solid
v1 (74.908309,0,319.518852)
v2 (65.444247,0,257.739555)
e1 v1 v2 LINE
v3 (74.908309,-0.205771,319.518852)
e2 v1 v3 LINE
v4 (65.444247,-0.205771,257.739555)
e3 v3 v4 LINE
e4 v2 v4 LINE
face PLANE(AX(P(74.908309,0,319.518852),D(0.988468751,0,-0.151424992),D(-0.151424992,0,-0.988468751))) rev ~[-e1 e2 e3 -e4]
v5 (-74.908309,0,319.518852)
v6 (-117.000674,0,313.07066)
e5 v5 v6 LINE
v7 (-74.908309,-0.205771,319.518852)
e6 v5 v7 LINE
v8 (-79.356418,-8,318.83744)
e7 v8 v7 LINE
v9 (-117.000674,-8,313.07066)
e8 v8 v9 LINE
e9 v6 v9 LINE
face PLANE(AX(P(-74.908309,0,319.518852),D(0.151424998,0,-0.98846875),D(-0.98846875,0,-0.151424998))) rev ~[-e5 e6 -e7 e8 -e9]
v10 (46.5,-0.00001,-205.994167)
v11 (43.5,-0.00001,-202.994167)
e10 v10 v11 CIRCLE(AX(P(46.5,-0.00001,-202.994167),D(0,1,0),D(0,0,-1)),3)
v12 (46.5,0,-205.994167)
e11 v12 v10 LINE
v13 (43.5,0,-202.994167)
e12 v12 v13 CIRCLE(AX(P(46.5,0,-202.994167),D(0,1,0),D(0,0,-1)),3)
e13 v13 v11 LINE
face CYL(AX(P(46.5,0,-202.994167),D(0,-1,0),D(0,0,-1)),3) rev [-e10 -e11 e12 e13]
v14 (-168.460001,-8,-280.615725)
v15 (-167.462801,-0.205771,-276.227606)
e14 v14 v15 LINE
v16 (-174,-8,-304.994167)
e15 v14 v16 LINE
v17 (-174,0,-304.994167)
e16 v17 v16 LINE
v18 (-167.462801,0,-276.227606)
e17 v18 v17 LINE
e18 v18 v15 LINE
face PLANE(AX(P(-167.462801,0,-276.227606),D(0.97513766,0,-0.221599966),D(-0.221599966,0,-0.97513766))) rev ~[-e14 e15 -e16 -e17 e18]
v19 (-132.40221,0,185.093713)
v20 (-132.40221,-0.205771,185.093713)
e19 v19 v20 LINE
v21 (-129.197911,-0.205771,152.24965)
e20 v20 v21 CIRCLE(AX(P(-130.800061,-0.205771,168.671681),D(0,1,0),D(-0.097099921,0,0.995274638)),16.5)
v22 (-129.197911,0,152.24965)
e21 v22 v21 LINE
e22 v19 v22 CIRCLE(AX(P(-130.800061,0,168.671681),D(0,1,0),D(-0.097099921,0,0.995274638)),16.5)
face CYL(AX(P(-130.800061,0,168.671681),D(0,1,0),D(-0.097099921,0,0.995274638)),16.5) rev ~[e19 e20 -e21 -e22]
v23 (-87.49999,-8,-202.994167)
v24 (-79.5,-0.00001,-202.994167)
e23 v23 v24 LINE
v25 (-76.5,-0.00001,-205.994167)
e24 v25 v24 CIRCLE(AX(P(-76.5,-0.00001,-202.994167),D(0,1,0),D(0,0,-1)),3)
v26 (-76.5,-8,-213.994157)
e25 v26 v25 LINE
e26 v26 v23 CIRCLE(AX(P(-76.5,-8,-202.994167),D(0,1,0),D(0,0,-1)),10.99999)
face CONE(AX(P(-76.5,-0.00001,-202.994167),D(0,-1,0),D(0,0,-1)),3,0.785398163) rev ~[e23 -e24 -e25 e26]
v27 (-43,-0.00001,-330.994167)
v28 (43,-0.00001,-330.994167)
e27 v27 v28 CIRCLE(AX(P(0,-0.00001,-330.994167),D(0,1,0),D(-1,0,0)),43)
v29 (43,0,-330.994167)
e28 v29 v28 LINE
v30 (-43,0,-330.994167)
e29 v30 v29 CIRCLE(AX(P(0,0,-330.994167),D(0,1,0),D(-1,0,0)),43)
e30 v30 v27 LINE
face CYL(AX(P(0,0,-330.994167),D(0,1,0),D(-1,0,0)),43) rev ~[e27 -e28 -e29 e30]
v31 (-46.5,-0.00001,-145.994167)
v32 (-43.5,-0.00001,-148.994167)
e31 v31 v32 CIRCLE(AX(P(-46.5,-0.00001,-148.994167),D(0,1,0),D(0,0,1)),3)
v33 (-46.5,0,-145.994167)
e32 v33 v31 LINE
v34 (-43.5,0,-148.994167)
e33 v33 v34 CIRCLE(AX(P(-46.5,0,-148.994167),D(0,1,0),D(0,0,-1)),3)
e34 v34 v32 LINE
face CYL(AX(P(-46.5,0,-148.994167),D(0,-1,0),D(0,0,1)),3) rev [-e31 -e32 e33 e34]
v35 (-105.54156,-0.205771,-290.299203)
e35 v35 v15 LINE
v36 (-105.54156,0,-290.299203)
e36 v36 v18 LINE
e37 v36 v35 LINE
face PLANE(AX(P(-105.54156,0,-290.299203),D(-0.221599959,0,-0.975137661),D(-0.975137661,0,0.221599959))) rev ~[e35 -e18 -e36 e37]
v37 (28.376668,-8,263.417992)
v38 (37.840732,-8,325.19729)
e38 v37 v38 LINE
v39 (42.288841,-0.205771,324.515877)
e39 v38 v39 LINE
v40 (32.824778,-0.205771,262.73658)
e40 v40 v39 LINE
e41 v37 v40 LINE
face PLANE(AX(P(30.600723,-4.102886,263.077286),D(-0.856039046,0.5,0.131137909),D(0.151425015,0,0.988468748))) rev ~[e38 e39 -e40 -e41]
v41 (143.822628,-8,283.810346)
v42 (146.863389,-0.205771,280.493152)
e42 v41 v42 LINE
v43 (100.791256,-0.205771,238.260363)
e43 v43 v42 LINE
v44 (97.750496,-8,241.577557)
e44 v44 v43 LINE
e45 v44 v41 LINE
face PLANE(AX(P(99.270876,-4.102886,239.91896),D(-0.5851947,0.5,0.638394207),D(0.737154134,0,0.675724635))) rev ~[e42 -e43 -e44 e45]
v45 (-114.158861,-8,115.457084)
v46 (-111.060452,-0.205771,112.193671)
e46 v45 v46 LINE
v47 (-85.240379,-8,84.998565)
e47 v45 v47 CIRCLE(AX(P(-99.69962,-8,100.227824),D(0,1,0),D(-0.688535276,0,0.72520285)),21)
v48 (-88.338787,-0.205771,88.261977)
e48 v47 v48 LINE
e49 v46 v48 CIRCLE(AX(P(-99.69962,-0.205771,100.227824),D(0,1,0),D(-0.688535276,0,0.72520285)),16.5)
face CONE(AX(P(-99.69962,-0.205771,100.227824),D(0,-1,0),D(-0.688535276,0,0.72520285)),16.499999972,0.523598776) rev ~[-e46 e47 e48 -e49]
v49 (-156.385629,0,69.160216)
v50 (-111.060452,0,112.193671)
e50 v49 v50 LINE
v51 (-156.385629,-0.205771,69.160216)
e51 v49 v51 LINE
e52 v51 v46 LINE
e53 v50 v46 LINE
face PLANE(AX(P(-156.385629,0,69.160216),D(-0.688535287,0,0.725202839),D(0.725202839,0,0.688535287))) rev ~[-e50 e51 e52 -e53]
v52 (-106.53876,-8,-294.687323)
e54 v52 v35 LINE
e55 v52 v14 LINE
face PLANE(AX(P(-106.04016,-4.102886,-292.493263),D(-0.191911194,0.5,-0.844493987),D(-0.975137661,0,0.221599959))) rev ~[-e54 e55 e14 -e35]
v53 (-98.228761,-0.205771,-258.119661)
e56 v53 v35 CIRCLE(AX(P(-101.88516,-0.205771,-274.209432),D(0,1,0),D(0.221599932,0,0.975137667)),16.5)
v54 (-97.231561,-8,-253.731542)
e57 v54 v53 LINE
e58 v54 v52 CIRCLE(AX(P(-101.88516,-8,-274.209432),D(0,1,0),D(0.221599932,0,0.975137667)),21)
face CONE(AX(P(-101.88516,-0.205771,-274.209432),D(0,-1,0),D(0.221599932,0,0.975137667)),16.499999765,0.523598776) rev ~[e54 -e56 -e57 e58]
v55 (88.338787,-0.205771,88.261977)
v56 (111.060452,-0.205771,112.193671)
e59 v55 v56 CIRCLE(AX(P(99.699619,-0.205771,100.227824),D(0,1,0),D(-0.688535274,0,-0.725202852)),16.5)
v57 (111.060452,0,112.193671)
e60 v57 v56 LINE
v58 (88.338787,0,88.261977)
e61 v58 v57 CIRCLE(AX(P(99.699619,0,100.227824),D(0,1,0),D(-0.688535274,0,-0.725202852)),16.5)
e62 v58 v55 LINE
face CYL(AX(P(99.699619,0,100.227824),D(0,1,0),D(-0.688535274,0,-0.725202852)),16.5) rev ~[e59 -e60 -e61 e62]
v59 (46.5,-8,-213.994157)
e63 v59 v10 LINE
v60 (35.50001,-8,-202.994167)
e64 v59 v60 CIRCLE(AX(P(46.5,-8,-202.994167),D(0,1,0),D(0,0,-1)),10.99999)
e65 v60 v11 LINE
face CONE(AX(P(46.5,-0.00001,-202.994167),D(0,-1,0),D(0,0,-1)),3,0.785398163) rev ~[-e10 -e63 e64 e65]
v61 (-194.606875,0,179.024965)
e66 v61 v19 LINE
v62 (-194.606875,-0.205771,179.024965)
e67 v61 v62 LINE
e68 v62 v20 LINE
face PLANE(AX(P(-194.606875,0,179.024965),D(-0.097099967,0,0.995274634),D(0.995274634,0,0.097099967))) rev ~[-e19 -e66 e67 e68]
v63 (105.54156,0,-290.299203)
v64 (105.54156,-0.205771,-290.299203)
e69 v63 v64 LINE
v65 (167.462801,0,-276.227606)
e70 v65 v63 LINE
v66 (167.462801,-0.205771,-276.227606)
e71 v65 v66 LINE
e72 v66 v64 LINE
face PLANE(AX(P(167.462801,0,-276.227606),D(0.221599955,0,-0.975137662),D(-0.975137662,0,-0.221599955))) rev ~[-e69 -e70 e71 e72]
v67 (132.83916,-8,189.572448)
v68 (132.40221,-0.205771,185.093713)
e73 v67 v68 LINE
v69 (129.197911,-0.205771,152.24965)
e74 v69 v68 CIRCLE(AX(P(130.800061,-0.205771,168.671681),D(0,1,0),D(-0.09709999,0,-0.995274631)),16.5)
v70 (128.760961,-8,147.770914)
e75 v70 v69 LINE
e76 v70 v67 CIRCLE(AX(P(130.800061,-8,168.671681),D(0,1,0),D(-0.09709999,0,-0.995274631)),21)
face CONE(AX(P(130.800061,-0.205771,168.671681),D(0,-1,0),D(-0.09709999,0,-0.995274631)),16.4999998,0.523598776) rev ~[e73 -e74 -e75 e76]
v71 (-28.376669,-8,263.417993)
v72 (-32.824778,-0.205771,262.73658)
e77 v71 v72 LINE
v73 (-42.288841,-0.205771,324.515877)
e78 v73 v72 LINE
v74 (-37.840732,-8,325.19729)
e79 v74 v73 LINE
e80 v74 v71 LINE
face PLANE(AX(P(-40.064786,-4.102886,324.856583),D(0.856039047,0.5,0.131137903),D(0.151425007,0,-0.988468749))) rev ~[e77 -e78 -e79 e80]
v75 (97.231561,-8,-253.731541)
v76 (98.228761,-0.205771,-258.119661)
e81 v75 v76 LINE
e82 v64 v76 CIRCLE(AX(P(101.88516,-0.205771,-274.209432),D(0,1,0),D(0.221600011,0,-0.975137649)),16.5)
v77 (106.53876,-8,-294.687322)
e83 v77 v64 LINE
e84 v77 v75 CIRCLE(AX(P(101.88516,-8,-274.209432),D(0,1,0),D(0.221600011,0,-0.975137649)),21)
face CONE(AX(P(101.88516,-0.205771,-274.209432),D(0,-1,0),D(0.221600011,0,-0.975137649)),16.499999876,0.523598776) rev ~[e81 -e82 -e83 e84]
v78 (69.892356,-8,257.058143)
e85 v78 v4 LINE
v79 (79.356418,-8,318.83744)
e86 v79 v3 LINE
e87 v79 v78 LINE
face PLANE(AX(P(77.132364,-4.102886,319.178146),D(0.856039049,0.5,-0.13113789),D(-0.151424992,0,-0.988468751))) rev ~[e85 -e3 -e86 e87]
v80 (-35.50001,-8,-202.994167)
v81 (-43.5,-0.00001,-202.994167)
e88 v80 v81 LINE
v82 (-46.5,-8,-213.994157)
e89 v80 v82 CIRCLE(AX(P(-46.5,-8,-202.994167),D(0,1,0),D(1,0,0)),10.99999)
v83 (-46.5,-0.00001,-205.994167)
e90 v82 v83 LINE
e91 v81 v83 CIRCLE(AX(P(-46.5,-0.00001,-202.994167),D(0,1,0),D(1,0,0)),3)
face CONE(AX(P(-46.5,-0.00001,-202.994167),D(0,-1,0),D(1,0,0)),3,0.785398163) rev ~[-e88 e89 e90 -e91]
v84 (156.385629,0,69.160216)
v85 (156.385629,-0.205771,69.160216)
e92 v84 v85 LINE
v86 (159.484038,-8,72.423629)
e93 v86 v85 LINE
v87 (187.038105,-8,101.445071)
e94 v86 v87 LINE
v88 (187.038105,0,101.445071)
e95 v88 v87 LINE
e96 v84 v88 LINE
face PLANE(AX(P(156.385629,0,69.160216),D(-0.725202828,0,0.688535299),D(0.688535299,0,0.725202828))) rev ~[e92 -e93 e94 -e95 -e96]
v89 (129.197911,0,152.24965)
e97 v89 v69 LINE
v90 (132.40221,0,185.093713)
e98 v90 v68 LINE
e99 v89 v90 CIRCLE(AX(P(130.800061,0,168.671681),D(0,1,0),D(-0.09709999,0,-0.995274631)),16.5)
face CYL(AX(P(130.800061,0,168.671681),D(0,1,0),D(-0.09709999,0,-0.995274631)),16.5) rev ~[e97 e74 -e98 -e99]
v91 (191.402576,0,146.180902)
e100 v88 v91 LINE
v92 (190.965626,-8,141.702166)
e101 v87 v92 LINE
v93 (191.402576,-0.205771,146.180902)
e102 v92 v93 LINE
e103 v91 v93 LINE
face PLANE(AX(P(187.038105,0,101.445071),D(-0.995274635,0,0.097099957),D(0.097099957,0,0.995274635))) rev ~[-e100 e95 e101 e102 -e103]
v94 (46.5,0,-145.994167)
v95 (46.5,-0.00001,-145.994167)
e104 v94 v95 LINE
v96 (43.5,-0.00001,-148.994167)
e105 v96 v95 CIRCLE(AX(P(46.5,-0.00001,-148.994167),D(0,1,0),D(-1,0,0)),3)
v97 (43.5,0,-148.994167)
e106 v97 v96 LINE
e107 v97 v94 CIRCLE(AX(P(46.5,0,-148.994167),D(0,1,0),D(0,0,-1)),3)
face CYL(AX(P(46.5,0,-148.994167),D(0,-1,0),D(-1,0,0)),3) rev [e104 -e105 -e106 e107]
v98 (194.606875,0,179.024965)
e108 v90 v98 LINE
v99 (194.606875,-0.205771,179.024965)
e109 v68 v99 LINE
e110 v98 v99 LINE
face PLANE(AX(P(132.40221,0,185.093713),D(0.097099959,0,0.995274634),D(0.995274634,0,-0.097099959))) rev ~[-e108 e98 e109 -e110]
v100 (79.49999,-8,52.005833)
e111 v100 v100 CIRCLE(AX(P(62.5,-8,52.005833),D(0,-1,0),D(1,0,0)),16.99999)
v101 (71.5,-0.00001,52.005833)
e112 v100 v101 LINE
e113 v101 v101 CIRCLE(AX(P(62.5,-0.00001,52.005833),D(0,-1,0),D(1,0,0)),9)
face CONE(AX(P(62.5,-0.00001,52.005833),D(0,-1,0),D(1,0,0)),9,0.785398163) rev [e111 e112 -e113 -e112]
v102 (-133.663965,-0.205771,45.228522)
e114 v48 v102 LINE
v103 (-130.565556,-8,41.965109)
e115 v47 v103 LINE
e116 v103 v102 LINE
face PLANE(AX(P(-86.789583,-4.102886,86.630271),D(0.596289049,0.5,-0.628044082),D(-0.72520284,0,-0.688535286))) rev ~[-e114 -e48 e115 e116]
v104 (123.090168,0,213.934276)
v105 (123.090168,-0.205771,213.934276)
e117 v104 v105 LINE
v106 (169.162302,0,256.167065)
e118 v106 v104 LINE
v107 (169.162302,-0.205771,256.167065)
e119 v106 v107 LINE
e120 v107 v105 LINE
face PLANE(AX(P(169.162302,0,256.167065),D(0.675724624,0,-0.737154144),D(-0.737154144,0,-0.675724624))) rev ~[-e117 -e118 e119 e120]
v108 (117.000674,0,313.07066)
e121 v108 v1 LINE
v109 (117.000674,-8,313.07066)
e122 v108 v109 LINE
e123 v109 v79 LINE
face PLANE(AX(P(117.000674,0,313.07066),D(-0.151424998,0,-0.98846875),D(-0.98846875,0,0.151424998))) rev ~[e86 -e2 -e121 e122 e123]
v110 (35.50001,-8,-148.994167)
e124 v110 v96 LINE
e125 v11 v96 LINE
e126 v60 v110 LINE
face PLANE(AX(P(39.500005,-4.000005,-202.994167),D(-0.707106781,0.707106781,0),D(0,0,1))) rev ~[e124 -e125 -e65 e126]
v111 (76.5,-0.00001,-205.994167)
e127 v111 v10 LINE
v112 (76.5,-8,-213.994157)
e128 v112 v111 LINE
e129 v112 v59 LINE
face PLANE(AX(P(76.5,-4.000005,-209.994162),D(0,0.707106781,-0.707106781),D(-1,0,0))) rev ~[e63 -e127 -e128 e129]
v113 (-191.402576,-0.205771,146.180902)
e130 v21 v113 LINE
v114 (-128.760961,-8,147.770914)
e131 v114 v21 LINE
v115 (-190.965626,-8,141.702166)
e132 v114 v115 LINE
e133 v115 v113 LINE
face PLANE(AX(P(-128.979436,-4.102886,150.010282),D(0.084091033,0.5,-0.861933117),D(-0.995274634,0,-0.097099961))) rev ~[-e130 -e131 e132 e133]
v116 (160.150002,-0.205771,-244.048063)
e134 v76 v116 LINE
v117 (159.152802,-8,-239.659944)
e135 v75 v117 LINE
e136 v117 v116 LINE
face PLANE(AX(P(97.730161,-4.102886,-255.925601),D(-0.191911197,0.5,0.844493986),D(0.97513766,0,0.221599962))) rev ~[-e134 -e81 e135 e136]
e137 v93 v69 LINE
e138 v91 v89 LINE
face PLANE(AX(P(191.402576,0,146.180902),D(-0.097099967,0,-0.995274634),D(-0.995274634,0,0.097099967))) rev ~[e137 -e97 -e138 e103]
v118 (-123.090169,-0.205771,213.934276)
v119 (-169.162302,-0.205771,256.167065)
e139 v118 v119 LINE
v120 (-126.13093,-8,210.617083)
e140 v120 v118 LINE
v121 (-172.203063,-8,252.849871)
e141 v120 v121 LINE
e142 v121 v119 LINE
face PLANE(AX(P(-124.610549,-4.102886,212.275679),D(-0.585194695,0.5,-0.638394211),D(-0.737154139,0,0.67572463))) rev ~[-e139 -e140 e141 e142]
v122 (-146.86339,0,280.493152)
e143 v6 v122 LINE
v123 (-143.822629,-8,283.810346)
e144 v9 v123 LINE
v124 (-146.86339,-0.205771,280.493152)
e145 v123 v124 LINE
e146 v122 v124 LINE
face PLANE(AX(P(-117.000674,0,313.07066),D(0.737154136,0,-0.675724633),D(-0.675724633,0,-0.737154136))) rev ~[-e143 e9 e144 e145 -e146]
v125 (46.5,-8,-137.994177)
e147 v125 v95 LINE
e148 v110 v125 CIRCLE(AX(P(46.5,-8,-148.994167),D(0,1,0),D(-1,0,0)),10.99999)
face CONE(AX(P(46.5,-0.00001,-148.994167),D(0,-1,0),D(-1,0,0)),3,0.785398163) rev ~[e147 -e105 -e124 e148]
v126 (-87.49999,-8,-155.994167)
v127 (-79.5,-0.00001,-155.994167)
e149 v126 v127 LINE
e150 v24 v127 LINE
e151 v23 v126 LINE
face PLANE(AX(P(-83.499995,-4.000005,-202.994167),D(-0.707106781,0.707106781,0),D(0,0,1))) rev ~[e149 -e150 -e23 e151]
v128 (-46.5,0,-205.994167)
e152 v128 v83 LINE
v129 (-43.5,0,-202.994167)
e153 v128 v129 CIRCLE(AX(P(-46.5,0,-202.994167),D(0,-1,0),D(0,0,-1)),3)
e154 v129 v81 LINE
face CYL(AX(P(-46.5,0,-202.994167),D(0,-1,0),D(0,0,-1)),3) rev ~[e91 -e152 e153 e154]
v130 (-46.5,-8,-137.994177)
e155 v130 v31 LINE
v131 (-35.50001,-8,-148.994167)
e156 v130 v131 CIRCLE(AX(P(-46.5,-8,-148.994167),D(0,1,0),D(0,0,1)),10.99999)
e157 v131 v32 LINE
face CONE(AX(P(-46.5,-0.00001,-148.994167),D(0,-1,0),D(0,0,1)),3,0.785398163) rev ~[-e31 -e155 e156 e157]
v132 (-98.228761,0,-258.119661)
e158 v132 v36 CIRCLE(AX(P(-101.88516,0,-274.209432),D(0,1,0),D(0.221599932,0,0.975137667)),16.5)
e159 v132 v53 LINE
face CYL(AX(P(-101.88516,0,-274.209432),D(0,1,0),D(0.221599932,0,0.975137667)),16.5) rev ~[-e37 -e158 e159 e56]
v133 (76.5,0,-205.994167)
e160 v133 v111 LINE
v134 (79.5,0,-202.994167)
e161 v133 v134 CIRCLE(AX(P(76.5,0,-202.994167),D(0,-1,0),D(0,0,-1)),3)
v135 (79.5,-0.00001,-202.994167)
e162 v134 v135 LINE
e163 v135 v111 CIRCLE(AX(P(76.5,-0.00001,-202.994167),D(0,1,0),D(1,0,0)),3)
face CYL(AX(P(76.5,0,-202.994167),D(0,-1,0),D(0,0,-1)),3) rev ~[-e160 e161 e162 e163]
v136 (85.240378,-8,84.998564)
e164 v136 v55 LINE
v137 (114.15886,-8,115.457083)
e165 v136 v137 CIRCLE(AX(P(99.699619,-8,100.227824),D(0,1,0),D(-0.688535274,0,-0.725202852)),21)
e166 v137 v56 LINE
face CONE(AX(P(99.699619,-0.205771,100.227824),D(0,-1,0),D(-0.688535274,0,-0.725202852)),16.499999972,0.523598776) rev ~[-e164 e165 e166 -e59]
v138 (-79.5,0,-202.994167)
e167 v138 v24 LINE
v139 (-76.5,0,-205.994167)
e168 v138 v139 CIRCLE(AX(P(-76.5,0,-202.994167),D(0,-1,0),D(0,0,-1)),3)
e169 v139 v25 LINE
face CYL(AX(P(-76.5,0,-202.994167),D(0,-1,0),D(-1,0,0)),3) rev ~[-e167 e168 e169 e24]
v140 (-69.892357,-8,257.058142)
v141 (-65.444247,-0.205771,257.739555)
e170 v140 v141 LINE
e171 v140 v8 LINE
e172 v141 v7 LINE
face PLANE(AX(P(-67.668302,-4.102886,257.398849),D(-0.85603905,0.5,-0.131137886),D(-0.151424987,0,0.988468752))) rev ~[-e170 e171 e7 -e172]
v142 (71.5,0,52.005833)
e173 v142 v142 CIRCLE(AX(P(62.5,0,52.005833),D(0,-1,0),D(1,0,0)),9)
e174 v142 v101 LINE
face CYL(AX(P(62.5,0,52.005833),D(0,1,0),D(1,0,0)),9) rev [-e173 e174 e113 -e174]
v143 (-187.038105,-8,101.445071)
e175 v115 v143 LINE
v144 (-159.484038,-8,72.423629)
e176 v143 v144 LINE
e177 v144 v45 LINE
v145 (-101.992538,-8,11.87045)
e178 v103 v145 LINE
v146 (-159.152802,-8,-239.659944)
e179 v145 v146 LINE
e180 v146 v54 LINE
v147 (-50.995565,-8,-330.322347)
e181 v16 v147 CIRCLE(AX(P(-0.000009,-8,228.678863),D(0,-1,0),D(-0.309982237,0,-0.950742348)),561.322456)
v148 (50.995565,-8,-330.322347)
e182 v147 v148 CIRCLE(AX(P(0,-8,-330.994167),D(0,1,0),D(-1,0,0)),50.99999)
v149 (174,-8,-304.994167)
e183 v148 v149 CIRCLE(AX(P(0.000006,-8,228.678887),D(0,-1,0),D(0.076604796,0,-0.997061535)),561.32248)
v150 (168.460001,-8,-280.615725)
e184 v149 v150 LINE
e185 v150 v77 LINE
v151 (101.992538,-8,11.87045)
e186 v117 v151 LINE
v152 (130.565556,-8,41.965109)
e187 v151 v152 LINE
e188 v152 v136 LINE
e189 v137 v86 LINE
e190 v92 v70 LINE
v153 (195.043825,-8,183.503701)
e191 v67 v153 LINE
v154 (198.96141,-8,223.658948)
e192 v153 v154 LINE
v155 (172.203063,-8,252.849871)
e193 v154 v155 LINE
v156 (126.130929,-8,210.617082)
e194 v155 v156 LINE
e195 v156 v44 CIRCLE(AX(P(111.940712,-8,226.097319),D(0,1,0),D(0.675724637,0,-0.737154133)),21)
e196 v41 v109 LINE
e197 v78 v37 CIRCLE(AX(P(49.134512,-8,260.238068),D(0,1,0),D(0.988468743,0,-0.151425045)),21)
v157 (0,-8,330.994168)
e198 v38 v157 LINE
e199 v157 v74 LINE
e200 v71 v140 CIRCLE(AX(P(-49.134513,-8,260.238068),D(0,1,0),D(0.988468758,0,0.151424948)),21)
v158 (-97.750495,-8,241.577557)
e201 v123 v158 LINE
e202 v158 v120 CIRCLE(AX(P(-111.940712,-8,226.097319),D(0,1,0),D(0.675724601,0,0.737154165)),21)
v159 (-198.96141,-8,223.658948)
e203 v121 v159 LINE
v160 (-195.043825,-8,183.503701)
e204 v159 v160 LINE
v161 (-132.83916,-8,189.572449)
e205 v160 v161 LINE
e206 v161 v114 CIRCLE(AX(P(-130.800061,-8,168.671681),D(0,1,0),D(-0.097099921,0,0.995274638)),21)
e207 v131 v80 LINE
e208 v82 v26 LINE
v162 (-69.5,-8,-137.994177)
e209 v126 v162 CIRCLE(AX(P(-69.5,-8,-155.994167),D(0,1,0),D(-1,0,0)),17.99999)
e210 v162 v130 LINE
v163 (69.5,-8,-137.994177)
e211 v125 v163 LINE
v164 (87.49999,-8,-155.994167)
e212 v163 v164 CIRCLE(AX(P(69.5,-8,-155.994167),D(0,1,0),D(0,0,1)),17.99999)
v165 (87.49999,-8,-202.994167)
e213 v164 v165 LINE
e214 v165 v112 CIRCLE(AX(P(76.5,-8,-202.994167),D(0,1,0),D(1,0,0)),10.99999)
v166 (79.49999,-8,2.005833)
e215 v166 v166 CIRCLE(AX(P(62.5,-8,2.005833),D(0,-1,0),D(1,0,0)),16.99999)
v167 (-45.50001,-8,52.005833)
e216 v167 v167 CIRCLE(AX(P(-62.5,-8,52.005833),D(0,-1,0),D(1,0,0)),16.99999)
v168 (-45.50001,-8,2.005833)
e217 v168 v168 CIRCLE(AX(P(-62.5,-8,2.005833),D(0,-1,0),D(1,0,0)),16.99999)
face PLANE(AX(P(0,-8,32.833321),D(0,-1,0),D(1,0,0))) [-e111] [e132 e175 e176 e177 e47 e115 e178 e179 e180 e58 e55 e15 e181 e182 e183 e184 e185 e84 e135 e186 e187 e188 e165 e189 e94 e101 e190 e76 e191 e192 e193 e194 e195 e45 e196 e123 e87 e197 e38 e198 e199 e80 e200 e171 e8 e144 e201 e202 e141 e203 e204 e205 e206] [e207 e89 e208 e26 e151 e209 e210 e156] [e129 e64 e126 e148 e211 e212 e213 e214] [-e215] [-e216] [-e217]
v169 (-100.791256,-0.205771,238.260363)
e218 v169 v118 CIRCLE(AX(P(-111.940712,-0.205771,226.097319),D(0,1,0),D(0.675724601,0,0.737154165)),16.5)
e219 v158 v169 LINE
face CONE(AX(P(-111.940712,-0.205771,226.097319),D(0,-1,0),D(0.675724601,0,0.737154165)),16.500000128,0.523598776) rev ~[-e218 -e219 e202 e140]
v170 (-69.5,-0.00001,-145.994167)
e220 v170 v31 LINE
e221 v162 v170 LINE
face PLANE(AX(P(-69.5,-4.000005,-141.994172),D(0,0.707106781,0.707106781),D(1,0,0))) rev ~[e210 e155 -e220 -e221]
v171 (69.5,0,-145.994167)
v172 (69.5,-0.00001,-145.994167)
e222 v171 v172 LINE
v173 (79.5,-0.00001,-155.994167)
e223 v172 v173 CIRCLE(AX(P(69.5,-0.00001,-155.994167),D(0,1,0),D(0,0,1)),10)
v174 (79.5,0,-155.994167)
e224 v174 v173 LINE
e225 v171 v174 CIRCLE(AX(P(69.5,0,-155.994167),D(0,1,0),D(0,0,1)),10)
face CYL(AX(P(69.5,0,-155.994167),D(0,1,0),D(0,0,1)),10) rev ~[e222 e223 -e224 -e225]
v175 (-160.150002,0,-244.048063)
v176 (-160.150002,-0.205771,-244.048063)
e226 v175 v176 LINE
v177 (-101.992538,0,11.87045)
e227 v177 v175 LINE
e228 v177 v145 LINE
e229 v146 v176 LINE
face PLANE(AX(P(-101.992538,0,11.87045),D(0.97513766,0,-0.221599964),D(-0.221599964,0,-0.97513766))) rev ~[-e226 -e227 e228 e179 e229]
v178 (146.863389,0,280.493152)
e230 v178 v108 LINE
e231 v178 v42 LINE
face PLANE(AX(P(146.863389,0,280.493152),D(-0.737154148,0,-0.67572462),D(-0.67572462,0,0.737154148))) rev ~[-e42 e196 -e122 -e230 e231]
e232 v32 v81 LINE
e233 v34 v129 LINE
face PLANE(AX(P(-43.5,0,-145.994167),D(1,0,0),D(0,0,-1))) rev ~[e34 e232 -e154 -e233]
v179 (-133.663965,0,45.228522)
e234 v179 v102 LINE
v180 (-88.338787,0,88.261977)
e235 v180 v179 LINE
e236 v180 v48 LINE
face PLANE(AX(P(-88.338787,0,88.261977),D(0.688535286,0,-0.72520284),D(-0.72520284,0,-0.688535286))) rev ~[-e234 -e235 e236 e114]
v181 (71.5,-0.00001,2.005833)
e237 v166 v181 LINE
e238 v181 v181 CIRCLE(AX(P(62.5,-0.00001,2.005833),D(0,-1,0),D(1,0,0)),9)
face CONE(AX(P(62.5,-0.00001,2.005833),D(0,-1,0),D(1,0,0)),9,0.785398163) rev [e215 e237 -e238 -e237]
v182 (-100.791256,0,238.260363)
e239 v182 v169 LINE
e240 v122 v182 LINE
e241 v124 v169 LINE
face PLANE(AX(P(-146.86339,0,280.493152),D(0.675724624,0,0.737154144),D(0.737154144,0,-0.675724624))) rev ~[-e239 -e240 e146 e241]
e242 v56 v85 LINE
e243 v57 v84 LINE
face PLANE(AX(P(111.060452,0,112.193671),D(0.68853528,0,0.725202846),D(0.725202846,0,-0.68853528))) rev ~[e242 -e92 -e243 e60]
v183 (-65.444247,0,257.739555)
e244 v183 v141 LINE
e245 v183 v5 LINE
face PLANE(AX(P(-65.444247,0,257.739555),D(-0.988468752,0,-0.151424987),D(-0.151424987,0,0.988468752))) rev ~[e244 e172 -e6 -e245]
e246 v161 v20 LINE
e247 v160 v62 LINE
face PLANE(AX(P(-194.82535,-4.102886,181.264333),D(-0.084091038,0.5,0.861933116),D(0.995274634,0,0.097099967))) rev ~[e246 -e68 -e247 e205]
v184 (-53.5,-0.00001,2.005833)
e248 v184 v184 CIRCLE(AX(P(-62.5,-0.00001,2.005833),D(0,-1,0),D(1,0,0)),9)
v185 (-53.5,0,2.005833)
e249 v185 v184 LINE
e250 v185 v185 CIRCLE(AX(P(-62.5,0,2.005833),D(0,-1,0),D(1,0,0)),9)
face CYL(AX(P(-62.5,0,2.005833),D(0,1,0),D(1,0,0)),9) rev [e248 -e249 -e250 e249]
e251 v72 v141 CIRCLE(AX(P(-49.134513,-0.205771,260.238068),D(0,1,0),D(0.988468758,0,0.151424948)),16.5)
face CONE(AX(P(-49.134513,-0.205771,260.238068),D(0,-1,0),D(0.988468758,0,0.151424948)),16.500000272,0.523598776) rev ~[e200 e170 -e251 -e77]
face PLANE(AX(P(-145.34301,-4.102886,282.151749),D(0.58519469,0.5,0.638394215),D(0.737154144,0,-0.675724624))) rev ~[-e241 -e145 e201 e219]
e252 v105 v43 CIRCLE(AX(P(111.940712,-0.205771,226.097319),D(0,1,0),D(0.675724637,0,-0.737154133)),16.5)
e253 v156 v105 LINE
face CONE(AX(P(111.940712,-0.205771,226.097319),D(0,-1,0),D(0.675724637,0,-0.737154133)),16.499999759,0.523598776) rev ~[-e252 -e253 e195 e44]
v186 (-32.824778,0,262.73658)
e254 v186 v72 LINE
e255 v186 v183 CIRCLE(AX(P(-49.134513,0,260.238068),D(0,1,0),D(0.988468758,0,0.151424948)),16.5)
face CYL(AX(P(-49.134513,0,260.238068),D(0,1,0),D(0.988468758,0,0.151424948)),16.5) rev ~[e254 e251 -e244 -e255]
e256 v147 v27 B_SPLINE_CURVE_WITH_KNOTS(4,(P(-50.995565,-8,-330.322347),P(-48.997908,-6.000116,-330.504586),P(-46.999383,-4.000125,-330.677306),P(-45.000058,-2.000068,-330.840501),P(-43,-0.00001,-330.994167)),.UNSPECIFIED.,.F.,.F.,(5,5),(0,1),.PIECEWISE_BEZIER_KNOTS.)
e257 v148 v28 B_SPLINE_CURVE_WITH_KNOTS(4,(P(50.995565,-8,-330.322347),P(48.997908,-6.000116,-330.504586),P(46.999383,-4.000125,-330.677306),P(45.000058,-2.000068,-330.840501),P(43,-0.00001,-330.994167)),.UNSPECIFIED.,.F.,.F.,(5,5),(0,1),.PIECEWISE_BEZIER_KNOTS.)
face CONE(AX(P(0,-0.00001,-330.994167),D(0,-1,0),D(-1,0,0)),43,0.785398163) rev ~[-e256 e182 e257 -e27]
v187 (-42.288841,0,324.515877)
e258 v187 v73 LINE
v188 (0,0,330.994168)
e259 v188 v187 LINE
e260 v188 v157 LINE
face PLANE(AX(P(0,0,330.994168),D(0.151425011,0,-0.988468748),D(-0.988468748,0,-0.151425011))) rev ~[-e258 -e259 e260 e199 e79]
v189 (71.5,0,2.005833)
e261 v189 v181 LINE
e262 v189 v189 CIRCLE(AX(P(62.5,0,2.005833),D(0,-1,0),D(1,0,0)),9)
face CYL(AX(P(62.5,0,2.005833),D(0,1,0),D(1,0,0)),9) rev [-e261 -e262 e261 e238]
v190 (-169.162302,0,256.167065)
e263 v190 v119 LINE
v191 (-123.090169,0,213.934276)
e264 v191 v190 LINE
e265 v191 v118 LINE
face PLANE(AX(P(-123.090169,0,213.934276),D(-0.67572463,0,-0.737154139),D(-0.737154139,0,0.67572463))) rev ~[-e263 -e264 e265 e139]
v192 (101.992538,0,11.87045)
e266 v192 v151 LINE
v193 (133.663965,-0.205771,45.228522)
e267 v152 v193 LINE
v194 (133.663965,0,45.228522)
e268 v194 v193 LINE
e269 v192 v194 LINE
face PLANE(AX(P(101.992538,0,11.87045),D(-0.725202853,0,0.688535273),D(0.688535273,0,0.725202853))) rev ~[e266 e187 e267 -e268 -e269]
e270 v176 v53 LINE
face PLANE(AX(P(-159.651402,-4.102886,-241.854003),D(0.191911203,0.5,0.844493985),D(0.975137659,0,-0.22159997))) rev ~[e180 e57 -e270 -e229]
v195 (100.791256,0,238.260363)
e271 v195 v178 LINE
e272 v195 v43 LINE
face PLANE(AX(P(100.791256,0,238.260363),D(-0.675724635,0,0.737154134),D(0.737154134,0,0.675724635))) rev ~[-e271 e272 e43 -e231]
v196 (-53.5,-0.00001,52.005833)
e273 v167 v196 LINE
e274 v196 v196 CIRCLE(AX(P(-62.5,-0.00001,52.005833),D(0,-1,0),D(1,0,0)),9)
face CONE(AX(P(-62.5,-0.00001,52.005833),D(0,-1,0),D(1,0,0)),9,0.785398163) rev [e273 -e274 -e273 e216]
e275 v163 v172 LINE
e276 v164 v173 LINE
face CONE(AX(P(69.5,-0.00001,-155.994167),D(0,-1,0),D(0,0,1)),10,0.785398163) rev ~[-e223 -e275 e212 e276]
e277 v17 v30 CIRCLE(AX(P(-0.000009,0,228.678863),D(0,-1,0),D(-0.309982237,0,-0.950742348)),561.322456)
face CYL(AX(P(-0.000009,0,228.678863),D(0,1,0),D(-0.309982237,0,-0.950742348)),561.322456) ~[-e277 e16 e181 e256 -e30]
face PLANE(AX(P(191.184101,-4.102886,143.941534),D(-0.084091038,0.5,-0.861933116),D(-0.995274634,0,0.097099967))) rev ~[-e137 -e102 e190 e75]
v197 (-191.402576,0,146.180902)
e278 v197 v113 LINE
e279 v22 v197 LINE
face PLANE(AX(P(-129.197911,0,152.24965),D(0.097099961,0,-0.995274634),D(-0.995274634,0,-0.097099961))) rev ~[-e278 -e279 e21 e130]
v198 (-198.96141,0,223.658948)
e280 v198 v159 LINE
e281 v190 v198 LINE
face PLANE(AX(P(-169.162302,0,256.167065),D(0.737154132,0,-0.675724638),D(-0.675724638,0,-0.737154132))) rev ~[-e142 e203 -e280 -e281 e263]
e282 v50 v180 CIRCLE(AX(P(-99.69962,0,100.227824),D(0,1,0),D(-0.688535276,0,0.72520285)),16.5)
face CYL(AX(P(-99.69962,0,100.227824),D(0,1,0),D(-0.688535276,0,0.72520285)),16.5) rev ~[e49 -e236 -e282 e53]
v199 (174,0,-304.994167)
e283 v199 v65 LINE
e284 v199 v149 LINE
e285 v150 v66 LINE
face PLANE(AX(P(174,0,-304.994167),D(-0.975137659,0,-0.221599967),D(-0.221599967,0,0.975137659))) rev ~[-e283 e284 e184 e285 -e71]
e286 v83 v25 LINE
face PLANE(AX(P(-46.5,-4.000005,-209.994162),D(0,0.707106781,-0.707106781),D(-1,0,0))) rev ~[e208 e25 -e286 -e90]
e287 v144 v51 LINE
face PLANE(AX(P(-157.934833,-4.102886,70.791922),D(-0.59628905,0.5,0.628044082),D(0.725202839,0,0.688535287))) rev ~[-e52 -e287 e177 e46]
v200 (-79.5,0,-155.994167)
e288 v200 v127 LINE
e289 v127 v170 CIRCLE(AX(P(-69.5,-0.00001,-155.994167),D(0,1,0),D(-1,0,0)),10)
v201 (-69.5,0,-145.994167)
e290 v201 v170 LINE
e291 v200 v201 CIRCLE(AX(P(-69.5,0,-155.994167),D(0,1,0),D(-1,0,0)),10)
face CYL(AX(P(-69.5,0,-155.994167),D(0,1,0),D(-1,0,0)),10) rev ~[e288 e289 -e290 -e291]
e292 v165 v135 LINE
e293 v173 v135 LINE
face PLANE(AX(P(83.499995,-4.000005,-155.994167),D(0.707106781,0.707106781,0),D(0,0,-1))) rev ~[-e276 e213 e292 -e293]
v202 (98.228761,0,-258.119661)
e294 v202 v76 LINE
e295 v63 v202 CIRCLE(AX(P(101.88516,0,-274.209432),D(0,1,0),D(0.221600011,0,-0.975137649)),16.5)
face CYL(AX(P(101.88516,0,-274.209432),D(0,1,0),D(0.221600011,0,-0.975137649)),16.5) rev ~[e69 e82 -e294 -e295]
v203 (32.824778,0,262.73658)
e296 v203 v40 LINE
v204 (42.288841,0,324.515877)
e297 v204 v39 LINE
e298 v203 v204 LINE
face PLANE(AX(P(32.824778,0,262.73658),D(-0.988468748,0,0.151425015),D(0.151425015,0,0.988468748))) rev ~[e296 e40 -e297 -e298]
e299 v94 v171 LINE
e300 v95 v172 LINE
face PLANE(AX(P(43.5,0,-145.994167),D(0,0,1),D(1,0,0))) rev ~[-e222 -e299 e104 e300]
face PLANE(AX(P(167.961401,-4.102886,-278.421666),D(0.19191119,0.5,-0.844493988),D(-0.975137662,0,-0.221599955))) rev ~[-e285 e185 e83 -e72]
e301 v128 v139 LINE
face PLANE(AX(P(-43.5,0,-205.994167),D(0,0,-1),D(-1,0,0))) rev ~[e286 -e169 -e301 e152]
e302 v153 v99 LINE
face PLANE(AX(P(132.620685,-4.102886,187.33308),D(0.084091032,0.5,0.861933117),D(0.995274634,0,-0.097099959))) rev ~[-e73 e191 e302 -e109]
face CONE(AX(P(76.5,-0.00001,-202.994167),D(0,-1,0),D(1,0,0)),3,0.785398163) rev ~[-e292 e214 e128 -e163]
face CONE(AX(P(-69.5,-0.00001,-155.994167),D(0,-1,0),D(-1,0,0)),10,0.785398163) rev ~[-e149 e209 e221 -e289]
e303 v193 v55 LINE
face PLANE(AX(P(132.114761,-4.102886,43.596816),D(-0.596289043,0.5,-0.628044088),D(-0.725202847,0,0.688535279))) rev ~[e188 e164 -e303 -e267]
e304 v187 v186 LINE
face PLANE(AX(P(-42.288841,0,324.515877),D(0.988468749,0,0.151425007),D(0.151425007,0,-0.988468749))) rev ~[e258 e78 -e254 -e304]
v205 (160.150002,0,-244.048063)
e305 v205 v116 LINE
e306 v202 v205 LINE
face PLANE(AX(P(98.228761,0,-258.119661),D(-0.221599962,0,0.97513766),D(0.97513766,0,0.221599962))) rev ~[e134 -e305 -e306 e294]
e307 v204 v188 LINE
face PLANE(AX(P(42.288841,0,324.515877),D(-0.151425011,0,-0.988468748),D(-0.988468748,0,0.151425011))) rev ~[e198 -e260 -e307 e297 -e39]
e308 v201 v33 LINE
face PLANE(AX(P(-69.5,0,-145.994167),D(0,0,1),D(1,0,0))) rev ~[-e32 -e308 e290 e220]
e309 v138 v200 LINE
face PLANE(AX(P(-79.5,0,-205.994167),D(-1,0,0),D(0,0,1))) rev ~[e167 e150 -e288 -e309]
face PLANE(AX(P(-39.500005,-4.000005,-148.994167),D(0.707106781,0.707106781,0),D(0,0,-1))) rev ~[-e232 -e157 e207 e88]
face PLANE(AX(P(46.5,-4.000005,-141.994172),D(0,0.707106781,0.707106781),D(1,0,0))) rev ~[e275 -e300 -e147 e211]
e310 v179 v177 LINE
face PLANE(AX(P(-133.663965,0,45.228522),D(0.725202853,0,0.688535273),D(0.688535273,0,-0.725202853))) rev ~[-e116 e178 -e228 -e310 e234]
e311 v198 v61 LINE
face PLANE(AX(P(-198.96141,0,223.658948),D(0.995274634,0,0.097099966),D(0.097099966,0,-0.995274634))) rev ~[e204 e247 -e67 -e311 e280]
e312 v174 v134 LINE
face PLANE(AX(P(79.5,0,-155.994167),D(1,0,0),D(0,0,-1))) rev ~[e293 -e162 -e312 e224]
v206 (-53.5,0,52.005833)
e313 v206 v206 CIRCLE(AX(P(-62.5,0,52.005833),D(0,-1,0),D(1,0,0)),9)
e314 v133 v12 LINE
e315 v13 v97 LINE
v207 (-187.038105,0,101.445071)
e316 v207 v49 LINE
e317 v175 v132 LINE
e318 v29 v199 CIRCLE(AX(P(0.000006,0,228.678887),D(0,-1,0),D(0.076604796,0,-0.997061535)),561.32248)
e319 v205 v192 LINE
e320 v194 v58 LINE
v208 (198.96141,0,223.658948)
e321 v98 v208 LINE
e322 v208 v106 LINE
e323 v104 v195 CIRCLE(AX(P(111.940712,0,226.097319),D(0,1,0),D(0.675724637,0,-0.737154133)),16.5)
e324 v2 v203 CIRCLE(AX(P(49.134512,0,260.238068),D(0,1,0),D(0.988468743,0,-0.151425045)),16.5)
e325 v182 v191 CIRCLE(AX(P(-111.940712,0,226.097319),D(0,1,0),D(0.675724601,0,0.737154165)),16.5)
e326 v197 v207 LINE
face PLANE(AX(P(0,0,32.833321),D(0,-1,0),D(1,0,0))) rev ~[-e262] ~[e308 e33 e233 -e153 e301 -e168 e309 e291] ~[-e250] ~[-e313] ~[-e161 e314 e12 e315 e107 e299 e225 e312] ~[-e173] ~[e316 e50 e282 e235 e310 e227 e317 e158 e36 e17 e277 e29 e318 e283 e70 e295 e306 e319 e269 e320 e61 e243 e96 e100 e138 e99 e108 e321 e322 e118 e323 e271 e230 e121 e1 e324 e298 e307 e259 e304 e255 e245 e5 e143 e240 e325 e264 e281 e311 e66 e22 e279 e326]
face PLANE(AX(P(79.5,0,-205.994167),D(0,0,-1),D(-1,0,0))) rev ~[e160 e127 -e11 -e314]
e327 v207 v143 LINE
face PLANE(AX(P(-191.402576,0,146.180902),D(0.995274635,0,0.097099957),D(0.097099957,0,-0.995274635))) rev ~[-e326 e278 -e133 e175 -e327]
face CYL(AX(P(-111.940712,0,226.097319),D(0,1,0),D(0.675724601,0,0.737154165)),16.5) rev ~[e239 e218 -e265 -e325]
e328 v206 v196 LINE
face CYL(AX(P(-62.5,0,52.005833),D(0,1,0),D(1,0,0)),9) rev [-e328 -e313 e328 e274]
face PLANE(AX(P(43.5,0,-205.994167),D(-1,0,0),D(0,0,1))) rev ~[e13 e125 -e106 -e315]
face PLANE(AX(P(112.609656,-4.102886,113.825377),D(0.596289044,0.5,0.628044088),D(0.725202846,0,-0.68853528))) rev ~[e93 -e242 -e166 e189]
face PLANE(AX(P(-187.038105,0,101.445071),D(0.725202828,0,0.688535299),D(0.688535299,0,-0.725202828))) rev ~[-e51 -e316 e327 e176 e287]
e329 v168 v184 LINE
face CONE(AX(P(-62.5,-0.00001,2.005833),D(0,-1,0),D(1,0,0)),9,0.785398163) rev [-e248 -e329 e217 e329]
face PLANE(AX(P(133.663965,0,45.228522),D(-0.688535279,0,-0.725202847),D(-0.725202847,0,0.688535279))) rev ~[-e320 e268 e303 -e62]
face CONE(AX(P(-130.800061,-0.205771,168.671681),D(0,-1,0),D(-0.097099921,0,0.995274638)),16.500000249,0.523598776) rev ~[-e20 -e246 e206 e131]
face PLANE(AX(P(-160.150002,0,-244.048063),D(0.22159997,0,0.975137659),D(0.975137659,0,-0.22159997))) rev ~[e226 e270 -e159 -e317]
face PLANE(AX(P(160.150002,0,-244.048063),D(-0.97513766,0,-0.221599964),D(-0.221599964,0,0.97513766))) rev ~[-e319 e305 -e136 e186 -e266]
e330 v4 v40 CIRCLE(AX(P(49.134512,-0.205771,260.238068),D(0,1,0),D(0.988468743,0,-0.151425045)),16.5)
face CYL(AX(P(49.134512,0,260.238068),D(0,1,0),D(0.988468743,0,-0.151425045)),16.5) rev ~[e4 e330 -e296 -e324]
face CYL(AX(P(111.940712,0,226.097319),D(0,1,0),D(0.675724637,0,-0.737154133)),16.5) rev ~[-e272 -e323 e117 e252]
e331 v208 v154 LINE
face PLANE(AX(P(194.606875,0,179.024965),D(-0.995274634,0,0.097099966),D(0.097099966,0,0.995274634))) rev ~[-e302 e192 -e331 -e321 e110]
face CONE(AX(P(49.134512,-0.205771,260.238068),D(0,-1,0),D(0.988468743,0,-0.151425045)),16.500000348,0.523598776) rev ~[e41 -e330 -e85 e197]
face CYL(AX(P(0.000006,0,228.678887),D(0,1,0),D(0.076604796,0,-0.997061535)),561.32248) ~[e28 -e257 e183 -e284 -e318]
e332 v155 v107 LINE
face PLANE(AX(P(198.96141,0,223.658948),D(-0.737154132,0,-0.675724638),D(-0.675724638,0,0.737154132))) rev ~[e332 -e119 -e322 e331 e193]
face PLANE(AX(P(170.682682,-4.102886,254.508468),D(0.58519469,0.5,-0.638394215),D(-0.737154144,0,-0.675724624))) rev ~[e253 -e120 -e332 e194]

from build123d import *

# Parameters (mm, degrees)
F0_R     = 9
F1_DEPTH = 8
F2_R     = 3
F3_SIZE  = 7.99999
F4_SIZE2 = 7.7942286341
F4_SIZE  = 4.5


# Not quite as in the source:
# - a fillet or chamfer is up to 0.001 mm smaller than in the source, because OpenCascade refuses the exact size
# - ends of sketch curves that miss each other by under 0.0002 mm in the source are joined


with BuildPart() as f1:
    # F0 (on Front) → F1 (new body)
    with BuildSketch(Plane.XZ):
        with BuildLine():
            ThreePointArc((-43, -330.994167), (0, -287.994167), (43, -330.994167))
            ThreePointArc((43, -330.994167), (109.276026714, -321.904147751), (174.0000001055, -304.9941673237))
            Line((174.0000001055, -304.9941673237), (167.462801, -276.227606))
            Line((167.462801, -276.227606), (105.54156, -290.299203))
            ThreePointArc((105.54156, -290.299203), (85.7953886494, -277.8658315797), (98.2287608958, -258.1196605414))
            Line((98.2287608958, -258.1196605414), (160.150002, -244.048063))
            Line((160.150002, -244.048063), (101.992538, 11.87045))
            Line((101.992538, 11.87045), (133.663965, 45.228522))
            Line((133.663965, 45.228522), (88.338787, 88.261977))
            ThreePointArc((88.338787, 88.261977), (87.7337722092, 111.5886563014), (111.0604515643, 112.1936705411))
            Line((111.0604515643, 112.1936705411), (156.385629, 69.160216))
            Line((156.385629, 69.160216), (187.038105, 101.445071))
            Line((187.038105, 101.445071), (191.402576, 146.180902))
            Line((191.402576, 146.180902), (129.197911, 152.24965))
            ThreePointArc((129.197911, 152.24965), (114.3780295485, 170.2738304953), (132.4022099517, 185.0937125046))
            Line((132.4022099517, 185.0937125046), (194.606875, 179.024965))
            Line((194.606875, 179.024965), (198.96141, 223.658948))
            Line((198.96141, 223.658948), (169.162302, 256.167065))
            Line((169.162302, 256.167065), (123.090168, 213.934276))
            ThreePointArc((123.090168, 213.934276), (99.7776684169, 214.9478629238), (100.7912561729, 238.2603628114))
            Line((100.7912561729, 238.2603628114), (146.863389, 280.493152))
            Line((146.863389, 280.493152), (117.000674, 313.07066))
            Line((117.000674, 313.07066), (74.908309, 319.518852))
            Line((74.908309, 319.518852), (65.444247, 257.739555))
            ThreePointArc((65.444247, 257.739555), (46.6359995191, 243.928333625), (32.8247775616, 262.7365800672))
            Line((32.8247775616, 262.7365800672), (42.288841, 324.515877))
            Line((42.288841, 324.515877), (0, 330.994168))
            Line((0, 330.994168), (-42.288841, 324.515877))
            Line((-42.288841, 324.515877), (-32.824778, 262.73658))
            ThreePointArc((-32.824778, 262.73658), (-46.6360005191, 243.928333625), (-65.4442472887, 257.7395549558))
            Line((-65.4442472887, 257.7395549558), (-74.908309, 319.518852))
            Line((-74.908309, 319.518852), (-117.000674, 313.07066))
            Line((-117.000674, 313.07066), (-146.86339, 280.493152))
            Line((-146.86339, 280.493152), (-100.791256, 238.260363))
            ThreePointArc((-100.791256, 238.260363), (-99.7776686659, 214.9478626521), (-123.0901688686, 213.9342761433))
            Line((-123.0901688686, 213.9342761433), (-169.162302, 256.167065))
            Line((-169.162302, 256.167065), (-198.96141, 223.658948))
            Line((-198.96141, 223.658948), (-194.606875, 179.024965))
            Line((-194.606875, 179.024965), (-132.40221, 185.093713))
            ThreePointArc((-132.40221, 185.093713), (-114.3780295485, 170.2738304953), (-129.1979109611, 152.2496496015))
            Line((-129.1979109611, 152.2496496015), (-191.402576, 146.180902))
            Line((-191.402576, 146.180902), (-187.038105, 101.445071))
            Line((-187.038105, 101.445071), (-156.385629, 69.160216))
            Line((-156.385629, 69.160216), (-111.060452, 112.193671))
            ThreePointArc((-111.060452, 112.193671), (-87.7337732092, 111.5886563014), (-88.3387874357, 88.2619774589))
            Line((-88.3387874357, 88.2619774589), (-133.663965, 45.228522))
            Line((-133.663965, 45.228522), (-101.992538, 11.87045))
            Line((-101.992538, 11.87045), (-160.150002, -244.048063))
            Line((-160.150002, -244.048063), (-98.228761, -258.119661))
            ThreePointArc((-98.228761, -258.119661), (-85.7953886494, -277.8658315797), (-105.5415600551, -290.2992032425))
            Line((-105.5415600551, -290.2992032425), (-167.462801, -276.227606))
            Line((-167.462801, -276.227606), (-174, -304.994167))
            ThreePointArc((-174, -304.994167), (-109.276026714, -321.904147751), (-43, -330.994167))
        make_face()
        with BuildLine():
            Line((-69.5, -145.994167), (-43.5, -145.994167))
            Line((-43.5, -145.994167), (-43.5, -205.994167))
            Line((-43.5, -205.994167), (-79.5, -205.994167))
            Line((-79.5, -205.994167), (-79.5, -155.994167))
            ThreePointArc((-79.5, -155.994167), (-76.5710678119, -148.9230991881), (-69.5, -145.994167))
        make_face(mode=Mode.SUBTRACT)
        with BuildLine():
            Line((43.5, -205.994167), (43.5, -145.994167))
            Line((43.5, -145.994167), (69.5, -145.994167))
            ThreePointArc((69.5, -145.994167), (76.5710678119, -148.9230991881), (79.5, -155.994167))
            Line((79.5, -155.994167), (79.5, -205.994167))
            Line((79.5, -205.994167), (43.5, -205.994167))
        make_face(mode=Mode.SUBTRACT)
        with Locations((-62.5, 2.005833)):
            Circle(F0_R, mode=Mode.SUBTRACT)
        with Locations((-62.5, 52.005833)):
            Circle(F0_R, mode=Mode.SUBTRACT)
        with Locations((62.5, 2.005833)):
            Circle(F0_R, mode=Mode.SUBTRACT)
        with Locations((62.5, 52.005833)):
            Circle(F0_R, mode=Mode.SUBTRACT)
    extrude(amount=F1_DEPTH)

    # F2
    f2_edges = [f1.edges().sort_by_distance(p)[0] for p in [
        (-43.5, -4, -205.994167),
        (79.5, -4, -205.994167),
        (43.5, -4, -205.994167),
        (-79.5, -4, -205.994167),
        (-43.5, -4, -145.994167),
        (43.5, -4, -145.994167),
    ]]
    fillet(f2_edges, radius=F2_R)

    # F3 (size 8 in the source; OpenCascade refuses exactly that, so slightly less here)
    f3_edges = [f1.edges().sort_by_distance(p)[0] for p in [
        (-71.5, -8, 52.005833),
        (53.5, -8, 52.005833),
        (-71.5, -8, 2.005833),
        (53.5, -8, 2.005833),
        (-58, -8, -145.994167),
        (58, -8, -145.994167),
        (0, -8, -287.994167),
    ]]
    chamfer(f3_edges, length=F3_SIZE)

    # F4
    f4_edges = [f1.edges().sort_by_distance(p)[0] for p in [
        (-133.72304, -8, 90.676943),
        (-163.504543, -8, 182.059339),
        (-123.827323, -8, 259.376757),
        (-37.556809, -8, 293.626229),
        (70.176278, -8, 288.629204),
        (123.827323, -8, 259.376757),
        (163.504542, -8, 182.059339),
        (133.72304, -8, 90.676943),
        (129.189381, -8, -251.083862),
        (-129.189381, -8, -251.083862),
    ]]
    f4_side = f1.faces().sort_by_distance((0, -8, 8.818439))[0]
    chamfer(f4_edges, length=F4_SIZE, length2=F4_SIZE2, reference=f4_side)


solid = f1.part
